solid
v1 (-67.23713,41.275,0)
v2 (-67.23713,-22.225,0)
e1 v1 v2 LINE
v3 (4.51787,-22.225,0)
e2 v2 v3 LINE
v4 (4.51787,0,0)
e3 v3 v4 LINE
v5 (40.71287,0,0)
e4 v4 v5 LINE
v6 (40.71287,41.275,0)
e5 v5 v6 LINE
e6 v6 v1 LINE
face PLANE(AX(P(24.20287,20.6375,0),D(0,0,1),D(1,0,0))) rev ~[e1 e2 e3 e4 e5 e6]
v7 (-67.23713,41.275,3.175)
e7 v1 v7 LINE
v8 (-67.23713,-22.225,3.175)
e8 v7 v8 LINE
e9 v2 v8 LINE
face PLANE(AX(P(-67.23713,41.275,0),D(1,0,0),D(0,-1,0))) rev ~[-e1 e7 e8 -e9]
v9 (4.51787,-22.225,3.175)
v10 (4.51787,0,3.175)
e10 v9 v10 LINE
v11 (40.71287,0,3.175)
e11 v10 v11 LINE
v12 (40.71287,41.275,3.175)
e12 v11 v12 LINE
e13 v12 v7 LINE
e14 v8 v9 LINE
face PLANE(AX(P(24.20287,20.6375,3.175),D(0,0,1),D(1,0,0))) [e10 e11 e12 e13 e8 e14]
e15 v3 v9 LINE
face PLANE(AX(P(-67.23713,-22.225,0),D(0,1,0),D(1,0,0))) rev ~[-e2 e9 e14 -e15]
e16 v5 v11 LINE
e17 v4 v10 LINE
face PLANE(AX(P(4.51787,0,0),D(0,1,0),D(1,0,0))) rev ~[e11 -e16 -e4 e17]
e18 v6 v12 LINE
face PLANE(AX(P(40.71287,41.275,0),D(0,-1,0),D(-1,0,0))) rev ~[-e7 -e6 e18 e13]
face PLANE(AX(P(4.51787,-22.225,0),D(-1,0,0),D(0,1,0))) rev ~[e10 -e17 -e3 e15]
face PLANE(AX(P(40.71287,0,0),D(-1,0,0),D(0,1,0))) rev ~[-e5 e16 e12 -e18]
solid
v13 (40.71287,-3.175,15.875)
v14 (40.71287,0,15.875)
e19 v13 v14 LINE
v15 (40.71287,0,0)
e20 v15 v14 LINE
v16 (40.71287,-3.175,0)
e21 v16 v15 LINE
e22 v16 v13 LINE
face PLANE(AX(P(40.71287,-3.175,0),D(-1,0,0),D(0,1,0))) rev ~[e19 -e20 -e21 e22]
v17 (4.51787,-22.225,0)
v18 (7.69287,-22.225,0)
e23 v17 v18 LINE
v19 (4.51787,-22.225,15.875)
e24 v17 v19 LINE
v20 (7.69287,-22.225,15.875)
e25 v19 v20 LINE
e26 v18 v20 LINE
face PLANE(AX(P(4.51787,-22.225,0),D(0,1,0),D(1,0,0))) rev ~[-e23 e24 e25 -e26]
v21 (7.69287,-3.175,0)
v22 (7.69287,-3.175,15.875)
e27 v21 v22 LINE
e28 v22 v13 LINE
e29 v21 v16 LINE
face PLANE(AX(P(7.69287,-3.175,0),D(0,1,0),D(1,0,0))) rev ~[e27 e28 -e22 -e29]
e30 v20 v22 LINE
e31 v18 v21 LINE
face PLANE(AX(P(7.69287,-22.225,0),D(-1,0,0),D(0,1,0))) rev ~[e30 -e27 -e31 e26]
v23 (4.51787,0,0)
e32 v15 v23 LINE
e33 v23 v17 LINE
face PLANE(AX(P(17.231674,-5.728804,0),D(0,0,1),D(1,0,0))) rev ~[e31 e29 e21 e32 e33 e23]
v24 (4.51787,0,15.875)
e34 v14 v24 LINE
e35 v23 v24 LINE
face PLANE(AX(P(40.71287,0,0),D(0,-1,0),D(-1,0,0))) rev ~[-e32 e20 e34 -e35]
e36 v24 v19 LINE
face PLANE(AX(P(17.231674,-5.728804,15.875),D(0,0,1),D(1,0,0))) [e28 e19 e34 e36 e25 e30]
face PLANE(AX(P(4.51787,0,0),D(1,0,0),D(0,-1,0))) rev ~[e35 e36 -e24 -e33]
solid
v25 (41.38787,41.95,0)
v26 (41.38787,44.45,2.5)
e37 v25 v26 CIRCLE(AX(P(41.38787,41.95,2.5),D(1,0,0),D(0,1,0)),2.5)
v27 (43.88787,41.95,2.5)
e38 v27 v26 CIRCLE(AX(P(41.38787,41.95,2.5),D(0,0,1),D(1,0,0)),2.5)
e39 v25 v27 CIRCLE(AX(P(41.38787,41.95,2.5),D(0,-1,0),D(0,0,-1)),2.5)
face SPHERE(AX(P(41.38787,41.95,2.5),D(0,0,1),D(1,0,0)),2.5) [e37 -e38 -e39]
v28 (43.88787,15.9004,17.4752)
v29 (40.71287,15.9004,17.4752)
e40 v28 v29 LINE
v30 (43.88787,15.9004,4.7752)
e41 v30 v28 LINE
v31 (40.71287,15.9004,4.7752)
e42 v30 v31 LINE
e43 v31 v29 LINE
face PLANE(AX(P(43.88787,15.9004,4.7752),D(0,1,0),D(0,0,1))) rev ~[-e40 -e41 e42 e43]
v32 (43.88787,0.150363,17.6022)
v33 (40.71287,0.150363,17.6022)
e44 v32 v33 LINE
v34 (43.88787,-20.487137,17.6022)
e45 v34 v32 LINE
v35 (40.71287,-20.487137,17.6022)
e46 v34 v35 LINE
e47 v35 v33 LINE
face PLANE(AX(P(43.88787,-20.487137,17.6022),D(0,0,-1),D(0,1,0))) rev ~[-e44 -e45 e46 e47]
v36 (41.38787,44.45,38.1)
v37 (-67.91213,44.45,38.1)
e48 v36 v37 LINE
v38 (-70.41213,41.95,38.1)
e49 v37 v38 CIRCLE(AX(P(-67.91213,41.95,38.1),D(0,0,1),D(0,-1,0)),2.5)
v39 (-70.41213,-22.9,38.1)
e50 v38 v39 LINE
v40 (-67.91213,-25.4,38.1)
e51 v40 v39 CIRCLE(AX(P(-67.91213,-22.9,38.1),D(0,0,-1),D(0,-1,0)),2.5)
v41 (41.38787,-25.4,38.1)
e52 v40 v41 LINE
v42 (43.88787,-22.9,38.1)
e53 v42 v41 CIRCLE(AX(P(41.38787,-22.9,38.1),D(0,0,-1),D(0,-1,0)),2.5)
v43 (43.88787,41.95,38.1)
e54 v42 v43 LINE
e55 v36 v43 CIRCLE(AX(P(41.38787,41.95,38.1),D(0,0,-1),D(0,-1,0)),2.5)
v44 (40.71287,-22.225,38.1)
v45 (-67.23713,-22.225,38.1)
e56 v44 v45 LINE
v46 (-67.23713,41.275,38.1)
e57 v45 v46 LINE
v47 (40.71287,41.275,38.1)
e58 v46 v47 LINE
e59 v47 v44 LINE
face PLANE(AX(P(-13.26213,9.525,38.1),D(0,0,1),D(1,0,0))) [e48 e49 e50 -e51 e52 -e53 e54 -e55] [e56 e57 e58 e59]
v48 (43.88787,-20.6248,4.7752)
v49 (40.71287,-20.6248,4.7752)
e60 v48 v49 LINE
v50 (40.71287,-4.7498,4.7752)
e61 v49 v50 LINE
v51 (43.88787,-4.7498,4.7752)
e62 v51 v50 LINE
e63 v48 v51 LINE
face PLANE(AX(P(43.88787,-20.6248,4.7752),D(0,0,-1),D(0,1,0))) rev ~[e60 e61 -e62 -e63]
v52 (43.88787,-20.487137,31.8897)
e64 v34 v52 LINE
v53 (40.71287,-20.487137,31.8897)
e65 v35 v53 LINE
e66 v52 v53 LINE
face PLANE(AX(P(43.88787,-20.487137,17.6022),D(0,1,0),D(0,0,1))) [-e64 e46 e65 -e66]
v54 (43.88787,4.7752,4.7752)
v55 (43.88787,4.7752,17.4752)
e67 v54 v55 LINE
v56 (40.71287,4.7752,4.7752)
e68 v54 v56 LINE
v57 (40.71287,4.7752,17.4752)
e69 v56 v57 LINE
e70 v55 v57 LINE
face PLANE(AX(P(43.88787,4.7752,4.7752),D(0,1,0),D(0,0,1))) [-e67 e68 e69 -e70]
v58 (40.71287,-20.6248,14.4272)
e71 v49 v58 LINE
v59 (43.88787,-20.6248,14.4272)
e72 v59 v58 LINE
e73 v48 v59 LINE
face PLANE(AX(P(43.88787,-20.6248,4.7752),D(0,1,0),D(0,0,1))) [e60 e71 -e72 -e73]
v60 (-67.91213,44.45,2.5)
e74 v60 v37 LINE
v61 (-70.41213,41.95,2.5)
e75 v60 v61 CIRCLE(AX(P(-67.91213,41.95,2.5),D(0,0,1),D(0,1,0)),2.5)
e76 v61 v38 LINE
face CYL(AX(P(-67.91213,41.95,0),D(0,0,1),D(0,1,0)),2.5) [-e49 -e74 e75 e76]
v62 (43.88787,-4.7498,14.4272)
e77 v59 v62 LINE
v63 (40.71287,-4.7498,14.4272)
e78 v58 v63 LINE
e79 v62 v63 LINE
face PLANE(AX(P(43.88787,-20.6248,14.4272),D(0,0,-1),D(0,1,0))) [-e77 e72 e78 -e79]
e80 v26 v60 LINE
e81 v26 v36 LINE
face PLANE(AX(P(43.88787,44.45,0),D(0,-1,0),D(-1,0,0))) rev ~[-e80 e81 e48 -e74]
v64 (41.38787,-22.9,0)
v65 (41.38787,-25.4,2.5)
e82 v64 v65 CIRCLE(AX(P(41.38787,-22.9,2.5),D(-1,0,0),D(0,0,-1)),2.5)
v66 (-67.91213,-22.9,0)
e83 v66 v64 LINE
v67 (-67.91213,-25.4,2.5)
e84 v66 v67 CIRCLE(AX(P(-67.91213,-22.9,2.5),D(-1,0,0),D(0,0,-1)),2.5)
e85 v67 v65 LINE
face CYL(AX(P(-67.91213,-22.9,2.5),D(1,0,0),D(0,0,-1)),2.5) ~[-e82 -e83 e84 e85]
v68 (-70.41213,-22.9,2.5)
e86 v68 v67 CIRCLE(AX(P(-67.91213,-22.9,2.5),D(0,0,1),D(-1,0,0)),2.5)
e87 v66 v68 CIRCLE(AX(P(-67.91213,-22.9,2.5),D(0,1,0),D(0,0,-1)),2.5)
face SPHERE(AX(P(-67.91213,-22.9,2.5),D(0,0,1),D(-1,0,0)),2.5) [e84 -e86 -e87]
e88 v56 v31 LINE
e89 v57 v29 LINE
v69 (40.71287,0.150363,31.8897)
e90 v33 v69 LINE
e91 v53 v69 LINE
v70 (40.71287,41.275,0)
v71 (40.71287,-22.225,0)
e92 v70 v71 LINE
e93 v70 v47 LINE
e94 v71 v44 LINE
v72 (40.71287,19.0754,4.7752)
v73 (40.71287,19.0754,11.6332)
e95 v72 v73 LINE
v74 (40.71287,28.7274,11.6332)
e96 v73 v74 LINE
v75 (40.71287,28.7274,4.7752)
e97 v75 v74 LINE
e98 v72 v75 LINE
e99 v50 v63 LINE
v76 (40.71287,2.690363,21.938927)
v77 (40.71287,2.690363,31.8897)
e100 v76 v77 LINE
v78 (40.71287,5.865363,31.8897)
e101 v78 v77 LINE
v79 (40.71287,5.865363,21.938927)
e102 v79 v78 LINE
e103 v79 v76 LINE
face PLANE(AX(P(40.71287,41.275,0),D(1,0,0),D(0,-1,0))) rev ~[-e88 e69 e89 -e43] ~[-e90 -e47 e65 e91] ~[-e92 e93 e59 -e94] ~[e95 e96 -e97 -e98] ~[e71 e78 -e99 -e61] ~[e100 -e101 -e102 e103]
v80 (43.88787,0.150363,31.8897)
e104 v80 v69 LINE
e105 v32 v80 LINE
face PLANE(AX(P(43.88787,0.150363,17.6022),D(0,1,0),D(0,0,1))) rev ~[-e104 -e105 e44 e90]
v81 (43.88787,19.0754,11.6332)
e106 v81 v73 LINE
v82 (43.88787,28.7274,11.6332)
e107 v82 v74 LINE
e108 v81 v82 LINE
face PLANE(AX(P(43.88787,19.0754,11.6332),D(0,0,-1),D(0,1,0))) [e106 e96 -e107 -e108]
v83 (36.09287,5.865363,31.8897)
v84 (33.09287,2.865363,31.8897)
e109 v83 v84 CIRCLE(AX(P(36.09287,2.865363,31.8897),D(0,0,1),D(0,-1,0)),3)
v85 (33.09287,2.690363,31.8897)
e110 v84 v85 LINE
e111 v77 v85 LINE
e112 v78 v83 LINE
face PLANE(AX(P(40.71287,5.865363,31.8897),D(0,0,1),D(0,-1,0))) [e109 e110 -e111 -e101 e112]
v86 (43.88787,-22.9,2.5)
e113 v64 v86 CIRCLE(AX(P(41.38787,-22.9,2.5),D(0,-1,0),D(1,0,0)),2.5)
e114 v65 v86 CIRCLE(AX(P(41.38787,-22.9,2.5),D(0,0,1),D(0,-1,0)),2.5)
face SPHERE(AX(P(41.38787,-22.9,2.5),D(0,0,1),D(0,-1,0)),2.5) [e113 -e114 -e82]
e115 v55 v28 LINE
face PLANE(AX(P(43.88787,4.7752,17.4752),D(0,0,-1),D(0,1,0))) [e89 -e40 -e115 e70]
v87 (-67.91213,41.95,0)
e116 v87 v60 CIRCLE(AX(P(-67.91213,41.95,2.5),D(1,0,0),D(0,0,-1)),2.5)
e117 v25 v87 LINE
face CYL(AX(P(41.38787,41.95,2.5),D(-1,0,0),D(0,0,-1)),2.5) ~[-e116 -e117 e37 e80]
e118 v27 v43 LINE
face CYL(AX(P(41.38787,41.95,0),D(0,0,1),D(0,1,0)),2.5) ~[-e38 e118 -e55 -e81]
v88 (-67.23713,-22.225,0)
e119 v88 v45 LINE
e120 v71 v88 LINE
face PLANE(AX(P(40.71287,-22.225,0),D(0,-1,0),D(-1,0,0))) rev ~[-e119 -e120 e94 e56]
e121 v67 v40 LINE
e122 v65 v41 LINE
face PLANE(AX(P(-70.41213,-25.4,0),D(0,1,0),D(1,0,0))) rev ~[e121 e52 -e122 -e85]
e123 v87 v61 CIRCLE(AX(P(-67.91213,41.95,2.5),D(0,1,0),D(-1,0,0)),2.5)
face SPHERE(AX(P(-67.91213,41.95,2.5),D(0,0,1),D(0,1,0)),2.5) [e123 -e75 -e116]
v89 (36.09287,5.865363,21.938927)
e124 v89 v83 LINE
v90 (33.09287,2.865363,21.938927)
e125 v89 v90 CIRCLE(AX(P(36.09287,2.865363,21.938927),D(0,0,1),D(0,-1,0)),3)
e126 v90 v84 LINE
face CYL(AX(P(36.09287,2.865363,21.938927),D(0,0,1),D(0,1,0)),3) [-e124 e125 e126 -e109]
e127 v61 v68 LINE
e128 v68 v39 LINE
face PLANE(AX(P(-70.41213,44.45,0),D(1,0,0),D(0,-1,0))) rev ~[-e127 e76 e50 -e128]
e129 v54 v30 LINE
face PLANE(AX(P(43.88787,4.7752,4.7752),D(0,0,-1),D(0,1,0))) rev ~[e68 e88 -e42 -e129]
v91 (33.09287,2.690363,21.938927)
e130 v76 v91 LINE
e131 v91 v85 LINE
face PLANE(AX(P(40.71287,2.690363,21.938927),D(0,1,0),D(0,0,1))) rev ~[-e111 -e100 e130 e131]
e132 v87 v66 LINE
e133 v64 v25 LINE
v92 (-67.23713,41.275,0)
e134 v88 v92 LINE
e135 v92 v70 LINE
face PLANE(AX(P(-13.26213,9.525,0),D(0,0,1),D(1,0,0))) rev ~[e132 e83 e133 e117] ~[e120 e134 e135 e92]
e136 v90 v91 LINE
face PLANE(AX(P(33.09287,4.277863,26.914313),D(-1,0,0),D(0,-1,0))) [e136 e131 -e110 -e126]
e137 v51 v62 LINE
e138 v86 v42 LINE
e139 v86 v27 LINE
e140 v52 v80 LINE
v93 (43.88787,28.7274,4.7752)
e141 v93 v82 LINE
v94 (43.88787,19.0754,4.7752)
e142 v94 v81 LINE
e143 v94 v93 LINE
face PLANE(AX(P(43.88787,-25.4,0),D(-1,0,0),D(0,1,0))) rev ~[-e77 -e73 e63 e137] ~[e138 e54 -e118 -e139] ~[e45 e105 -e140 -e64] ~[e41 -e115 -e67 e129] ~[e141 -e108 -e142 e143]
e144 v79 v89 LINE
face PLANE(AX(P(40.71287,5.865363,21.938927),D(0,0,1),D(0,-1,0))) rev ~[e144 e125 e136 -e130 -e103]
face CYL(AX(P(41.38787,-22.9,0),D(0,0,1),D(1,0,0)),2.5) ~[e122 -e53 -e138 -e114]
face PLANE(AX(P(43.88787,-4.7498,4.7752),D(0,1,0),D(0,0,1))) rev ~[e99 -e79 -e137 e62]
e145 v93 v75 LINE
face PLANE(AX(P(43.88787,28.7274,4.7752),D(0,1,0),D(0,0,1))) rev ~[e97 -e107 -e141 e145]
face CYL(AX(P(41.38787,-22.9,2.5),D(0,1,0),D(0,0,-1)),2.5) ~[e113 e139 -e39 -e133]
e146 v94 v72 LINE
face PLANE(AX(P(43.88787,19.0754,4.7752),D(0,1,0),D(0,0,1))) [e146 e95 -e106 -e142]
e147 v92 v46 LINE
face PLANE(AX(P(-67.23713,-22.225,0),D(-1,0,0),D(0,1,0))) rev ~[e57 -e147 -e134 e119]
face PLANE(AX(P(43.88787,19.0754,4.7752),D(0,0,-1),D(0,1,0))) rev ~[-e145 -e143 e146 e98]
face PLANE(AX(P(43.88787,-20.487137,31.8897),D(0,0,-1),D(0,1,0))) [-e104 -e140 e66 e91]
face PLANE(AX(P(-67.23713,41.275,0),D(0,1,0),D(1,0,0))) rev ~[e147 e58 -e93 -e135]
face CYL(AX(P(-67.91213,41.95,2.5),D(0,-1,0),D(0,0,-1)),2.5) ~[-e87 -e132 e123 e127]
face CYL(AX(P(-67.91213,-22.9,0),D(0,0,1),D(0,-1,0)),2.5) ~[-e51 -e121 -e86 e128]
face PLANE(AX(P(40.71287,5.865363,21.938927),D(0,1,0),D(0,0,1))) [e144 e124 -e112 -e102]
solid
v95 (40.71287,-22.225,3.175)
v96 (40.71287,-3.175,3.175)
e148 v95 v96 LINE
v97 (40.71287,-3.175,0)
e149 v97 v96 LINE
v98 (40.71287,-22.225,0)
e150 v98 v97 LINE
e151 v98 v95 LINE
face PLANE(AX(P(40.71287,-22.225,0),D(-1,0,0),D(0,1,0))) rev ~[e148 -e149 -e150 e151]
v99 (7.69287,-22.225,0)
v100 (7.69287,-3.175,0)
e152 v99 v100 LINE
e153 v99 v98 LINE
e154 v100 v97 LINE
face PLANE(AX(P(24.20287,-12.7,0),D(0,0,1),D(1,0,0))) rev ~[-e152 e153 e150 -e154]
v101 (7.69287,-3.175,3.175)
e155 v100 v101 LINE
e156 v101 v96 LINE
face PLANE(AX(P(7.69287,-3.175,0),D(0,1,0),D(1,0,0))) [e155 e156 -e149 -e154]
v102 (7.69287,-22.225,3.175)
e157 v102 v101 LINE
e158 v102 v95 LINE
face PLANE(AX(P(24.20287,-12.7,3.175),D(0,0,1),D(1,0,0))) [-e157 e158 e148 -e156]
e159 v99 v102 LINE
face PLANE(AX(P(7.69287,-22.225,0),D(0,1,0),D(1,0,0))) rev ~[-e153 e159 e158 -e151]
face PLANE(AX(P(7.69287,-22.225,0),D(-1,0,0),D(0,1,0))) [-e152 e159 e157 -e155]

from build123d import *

# Parameters (mm, degrees)
F0_W     = 33.02
F0_H     = 41.275
F0_W_2   = 3.175
F1_DEPTH = 3.175
F0_H_2   = 19.05
F2_DEPTH = 15.875
F3_DEPTH = 38.1
F4_W     = 15.875
F4_H     = 9.652
F4_W_2   = 11.1252
F4_H_2   = 12.7
F4_W_3   = 9.652
F4_H_3   = 6.858
F4_W_4   = 20.6375
F4_H_4   = 14.2875
F5_DEPTH = 6.604
F6_W     = 3.175
F6_H     = 9.9507730049
F7_DEPTH = 7.62
F8_R     = 3
F9_R     = 2.5
F10_R    = 2.5
F11_R    = 2.5
F12_R    = 2.5
F13_R    = 2.5


# Not quite as in the source:
# - a feature names something its author has since deleted; it is built from what else it names


with BuildPart() as f1:
    # F0 (on Top) → F1 (new body)
    with BuildSketch(Plane.XY):
        with Locations((24.2028696799, 20.6375)):
            Rectangle(F0_W, F0_H)
        Polygon((4.5178696799, 0), (4.5178696799, 41.275), (-67.2371303201, 41.275), (-67.2371303201, -22.225), (4.5178696799, -22.225), align=None)
        with Locations((6.1053696799, 20.6375)):
            Rectangle(F0_W_2, F0_H)
    extrude(amount=F1_DEPTH)


with BuildPart() as f1b:
    # F0 (on Top) → F1, piece 2 (new body)
    with BuildSketch(Plane.XY):
        with Locations((24.2028696799, -12.7)):
            Rectangle(F0_W, F0_H_2)
    extrude(amount=F1_DEPTH)


with BuildPart() as f2:
    # F0 (on Top) → F2 (new body)
    with BuildSketch(Plane.XY):
        Polygon((40.7128696799, -3.175), (40.7128696799, 0), (7.6928696799, 0), (4.5178696799, 0), (4.5178696799, -22.225), (7.6928696799, -22.225), (7.6928696799, -3.175), align=None)
    extrude(amount=F2_DEPTH)


with BuildPart() as f3:
    # F0 (on Top) → F3 (new body)
    with BuildSketch(Plane.XY):
        Polygon((43.8878696799, 44.45), (-70.4121303201, 44.45), (-70.4121303201, -25.4), (43.8878696799, -25.4), (43.8878696799, 0), align=None)
        Polygon((7.6928696799, 41.275), (40.7128696799, 41.275), (40.7128696799, 0), (40.7128696799, -3.175), (40.7128696799, -22.225), (7.6928696799, -22.225), (4.5178696799, -22.225), (-67.2371303201, -22.225), (-67.2371303201, 41.275), (4.5178696799, 41.275), align=None, mode=Mode.SUBTRACT)
    extrude(amount=F3_DEPTH)

    # F4 (on face) → F5 (cut)
    with BuildSketch(Plane.YZ.offset(43.8878696799)):
        with Locations((-12.6873, 9.6012)):
            Rectangle(F4_W, F4_H)
        with Locations((10.3378, 11.1252)):
            Rectangle(F4_W_2, F4_H_2)
        with Locations((23.9014, 8.2042)):
            Rectangle(F4_W_3, F4_H_3)
        with Locations((-10.1683871388, 24.74595)):
            Rectangle(F4_W_4, F4_H_4)
    extrude(amount=-F5_DEPTH, mode=Mode.SUBTRACT)

    # F6 (on face) → F7 (join)
    with BuildSketch(Plane(origin=(40.7128696799, 0, 0), x_dir=(0, -1, 0), z_dir=(-1, 0, 0))):
        with Locations((-4.2778628612, 26.9143134976)):
            Rectangle(F6_W, F6_H)
    extrude(amount=F7_DEPTH)

    # F8
    f8_edges = [f3.edges().sort_by_distance(p)[0] for p in [
        (33.09287, 5.865363, 26.914313),
    ]]
    fillet(f8_edges, radius=F8_R)

    # F9
    f9_edges = [f3.edges().sort_by_distance(p)[0] for p in [
        (-70.41213, 44.45, 19.05),
    ]]
    fillet(f9_edges, radius=F9_R)

    # F10
    f10_edges = [f3.edges().sort_by_distance(p)[0] for p in [
        (43.88787, 44.45, 19.05),
    ]]
    fillet(f10_edges, radius=F10_R)

    # F11
    f11_edges = [f3.edges().sort_by_distance(p)[0] for p in [
        (43.88787, -25.4, 19.05),
    ]]
    fillet(f11_edges, radius=F11_R)

    # F12
    f12_edges = [f3.edges().sort_by_distance(p)[0] for p in [
        (-70.41213, -25.4, 19.05),
    ]]
    fillet(f12_edges, radius=F12_R)

    # F13
    f13_edges = [f3.edges().sort_by_distance(p)[0] for p in [
        (-13.26213, -25.4, 0),
        (-69.679897, -24.667767, 0),
        (-70.41213, 9.525, 0),
        (-69.679897, 43.717767, 0),
        (-13.26213, 44.45, 0),
        (43.155637, 43.717767, 0),
        (43.88787, 9.525, 0),
        (43.155637, -24.667767, 0),
    ]]
    fillet(f13_edges, radius=F13_R)


solid = Compound([f1.part, f1b.part, f2.part, f3.part])
